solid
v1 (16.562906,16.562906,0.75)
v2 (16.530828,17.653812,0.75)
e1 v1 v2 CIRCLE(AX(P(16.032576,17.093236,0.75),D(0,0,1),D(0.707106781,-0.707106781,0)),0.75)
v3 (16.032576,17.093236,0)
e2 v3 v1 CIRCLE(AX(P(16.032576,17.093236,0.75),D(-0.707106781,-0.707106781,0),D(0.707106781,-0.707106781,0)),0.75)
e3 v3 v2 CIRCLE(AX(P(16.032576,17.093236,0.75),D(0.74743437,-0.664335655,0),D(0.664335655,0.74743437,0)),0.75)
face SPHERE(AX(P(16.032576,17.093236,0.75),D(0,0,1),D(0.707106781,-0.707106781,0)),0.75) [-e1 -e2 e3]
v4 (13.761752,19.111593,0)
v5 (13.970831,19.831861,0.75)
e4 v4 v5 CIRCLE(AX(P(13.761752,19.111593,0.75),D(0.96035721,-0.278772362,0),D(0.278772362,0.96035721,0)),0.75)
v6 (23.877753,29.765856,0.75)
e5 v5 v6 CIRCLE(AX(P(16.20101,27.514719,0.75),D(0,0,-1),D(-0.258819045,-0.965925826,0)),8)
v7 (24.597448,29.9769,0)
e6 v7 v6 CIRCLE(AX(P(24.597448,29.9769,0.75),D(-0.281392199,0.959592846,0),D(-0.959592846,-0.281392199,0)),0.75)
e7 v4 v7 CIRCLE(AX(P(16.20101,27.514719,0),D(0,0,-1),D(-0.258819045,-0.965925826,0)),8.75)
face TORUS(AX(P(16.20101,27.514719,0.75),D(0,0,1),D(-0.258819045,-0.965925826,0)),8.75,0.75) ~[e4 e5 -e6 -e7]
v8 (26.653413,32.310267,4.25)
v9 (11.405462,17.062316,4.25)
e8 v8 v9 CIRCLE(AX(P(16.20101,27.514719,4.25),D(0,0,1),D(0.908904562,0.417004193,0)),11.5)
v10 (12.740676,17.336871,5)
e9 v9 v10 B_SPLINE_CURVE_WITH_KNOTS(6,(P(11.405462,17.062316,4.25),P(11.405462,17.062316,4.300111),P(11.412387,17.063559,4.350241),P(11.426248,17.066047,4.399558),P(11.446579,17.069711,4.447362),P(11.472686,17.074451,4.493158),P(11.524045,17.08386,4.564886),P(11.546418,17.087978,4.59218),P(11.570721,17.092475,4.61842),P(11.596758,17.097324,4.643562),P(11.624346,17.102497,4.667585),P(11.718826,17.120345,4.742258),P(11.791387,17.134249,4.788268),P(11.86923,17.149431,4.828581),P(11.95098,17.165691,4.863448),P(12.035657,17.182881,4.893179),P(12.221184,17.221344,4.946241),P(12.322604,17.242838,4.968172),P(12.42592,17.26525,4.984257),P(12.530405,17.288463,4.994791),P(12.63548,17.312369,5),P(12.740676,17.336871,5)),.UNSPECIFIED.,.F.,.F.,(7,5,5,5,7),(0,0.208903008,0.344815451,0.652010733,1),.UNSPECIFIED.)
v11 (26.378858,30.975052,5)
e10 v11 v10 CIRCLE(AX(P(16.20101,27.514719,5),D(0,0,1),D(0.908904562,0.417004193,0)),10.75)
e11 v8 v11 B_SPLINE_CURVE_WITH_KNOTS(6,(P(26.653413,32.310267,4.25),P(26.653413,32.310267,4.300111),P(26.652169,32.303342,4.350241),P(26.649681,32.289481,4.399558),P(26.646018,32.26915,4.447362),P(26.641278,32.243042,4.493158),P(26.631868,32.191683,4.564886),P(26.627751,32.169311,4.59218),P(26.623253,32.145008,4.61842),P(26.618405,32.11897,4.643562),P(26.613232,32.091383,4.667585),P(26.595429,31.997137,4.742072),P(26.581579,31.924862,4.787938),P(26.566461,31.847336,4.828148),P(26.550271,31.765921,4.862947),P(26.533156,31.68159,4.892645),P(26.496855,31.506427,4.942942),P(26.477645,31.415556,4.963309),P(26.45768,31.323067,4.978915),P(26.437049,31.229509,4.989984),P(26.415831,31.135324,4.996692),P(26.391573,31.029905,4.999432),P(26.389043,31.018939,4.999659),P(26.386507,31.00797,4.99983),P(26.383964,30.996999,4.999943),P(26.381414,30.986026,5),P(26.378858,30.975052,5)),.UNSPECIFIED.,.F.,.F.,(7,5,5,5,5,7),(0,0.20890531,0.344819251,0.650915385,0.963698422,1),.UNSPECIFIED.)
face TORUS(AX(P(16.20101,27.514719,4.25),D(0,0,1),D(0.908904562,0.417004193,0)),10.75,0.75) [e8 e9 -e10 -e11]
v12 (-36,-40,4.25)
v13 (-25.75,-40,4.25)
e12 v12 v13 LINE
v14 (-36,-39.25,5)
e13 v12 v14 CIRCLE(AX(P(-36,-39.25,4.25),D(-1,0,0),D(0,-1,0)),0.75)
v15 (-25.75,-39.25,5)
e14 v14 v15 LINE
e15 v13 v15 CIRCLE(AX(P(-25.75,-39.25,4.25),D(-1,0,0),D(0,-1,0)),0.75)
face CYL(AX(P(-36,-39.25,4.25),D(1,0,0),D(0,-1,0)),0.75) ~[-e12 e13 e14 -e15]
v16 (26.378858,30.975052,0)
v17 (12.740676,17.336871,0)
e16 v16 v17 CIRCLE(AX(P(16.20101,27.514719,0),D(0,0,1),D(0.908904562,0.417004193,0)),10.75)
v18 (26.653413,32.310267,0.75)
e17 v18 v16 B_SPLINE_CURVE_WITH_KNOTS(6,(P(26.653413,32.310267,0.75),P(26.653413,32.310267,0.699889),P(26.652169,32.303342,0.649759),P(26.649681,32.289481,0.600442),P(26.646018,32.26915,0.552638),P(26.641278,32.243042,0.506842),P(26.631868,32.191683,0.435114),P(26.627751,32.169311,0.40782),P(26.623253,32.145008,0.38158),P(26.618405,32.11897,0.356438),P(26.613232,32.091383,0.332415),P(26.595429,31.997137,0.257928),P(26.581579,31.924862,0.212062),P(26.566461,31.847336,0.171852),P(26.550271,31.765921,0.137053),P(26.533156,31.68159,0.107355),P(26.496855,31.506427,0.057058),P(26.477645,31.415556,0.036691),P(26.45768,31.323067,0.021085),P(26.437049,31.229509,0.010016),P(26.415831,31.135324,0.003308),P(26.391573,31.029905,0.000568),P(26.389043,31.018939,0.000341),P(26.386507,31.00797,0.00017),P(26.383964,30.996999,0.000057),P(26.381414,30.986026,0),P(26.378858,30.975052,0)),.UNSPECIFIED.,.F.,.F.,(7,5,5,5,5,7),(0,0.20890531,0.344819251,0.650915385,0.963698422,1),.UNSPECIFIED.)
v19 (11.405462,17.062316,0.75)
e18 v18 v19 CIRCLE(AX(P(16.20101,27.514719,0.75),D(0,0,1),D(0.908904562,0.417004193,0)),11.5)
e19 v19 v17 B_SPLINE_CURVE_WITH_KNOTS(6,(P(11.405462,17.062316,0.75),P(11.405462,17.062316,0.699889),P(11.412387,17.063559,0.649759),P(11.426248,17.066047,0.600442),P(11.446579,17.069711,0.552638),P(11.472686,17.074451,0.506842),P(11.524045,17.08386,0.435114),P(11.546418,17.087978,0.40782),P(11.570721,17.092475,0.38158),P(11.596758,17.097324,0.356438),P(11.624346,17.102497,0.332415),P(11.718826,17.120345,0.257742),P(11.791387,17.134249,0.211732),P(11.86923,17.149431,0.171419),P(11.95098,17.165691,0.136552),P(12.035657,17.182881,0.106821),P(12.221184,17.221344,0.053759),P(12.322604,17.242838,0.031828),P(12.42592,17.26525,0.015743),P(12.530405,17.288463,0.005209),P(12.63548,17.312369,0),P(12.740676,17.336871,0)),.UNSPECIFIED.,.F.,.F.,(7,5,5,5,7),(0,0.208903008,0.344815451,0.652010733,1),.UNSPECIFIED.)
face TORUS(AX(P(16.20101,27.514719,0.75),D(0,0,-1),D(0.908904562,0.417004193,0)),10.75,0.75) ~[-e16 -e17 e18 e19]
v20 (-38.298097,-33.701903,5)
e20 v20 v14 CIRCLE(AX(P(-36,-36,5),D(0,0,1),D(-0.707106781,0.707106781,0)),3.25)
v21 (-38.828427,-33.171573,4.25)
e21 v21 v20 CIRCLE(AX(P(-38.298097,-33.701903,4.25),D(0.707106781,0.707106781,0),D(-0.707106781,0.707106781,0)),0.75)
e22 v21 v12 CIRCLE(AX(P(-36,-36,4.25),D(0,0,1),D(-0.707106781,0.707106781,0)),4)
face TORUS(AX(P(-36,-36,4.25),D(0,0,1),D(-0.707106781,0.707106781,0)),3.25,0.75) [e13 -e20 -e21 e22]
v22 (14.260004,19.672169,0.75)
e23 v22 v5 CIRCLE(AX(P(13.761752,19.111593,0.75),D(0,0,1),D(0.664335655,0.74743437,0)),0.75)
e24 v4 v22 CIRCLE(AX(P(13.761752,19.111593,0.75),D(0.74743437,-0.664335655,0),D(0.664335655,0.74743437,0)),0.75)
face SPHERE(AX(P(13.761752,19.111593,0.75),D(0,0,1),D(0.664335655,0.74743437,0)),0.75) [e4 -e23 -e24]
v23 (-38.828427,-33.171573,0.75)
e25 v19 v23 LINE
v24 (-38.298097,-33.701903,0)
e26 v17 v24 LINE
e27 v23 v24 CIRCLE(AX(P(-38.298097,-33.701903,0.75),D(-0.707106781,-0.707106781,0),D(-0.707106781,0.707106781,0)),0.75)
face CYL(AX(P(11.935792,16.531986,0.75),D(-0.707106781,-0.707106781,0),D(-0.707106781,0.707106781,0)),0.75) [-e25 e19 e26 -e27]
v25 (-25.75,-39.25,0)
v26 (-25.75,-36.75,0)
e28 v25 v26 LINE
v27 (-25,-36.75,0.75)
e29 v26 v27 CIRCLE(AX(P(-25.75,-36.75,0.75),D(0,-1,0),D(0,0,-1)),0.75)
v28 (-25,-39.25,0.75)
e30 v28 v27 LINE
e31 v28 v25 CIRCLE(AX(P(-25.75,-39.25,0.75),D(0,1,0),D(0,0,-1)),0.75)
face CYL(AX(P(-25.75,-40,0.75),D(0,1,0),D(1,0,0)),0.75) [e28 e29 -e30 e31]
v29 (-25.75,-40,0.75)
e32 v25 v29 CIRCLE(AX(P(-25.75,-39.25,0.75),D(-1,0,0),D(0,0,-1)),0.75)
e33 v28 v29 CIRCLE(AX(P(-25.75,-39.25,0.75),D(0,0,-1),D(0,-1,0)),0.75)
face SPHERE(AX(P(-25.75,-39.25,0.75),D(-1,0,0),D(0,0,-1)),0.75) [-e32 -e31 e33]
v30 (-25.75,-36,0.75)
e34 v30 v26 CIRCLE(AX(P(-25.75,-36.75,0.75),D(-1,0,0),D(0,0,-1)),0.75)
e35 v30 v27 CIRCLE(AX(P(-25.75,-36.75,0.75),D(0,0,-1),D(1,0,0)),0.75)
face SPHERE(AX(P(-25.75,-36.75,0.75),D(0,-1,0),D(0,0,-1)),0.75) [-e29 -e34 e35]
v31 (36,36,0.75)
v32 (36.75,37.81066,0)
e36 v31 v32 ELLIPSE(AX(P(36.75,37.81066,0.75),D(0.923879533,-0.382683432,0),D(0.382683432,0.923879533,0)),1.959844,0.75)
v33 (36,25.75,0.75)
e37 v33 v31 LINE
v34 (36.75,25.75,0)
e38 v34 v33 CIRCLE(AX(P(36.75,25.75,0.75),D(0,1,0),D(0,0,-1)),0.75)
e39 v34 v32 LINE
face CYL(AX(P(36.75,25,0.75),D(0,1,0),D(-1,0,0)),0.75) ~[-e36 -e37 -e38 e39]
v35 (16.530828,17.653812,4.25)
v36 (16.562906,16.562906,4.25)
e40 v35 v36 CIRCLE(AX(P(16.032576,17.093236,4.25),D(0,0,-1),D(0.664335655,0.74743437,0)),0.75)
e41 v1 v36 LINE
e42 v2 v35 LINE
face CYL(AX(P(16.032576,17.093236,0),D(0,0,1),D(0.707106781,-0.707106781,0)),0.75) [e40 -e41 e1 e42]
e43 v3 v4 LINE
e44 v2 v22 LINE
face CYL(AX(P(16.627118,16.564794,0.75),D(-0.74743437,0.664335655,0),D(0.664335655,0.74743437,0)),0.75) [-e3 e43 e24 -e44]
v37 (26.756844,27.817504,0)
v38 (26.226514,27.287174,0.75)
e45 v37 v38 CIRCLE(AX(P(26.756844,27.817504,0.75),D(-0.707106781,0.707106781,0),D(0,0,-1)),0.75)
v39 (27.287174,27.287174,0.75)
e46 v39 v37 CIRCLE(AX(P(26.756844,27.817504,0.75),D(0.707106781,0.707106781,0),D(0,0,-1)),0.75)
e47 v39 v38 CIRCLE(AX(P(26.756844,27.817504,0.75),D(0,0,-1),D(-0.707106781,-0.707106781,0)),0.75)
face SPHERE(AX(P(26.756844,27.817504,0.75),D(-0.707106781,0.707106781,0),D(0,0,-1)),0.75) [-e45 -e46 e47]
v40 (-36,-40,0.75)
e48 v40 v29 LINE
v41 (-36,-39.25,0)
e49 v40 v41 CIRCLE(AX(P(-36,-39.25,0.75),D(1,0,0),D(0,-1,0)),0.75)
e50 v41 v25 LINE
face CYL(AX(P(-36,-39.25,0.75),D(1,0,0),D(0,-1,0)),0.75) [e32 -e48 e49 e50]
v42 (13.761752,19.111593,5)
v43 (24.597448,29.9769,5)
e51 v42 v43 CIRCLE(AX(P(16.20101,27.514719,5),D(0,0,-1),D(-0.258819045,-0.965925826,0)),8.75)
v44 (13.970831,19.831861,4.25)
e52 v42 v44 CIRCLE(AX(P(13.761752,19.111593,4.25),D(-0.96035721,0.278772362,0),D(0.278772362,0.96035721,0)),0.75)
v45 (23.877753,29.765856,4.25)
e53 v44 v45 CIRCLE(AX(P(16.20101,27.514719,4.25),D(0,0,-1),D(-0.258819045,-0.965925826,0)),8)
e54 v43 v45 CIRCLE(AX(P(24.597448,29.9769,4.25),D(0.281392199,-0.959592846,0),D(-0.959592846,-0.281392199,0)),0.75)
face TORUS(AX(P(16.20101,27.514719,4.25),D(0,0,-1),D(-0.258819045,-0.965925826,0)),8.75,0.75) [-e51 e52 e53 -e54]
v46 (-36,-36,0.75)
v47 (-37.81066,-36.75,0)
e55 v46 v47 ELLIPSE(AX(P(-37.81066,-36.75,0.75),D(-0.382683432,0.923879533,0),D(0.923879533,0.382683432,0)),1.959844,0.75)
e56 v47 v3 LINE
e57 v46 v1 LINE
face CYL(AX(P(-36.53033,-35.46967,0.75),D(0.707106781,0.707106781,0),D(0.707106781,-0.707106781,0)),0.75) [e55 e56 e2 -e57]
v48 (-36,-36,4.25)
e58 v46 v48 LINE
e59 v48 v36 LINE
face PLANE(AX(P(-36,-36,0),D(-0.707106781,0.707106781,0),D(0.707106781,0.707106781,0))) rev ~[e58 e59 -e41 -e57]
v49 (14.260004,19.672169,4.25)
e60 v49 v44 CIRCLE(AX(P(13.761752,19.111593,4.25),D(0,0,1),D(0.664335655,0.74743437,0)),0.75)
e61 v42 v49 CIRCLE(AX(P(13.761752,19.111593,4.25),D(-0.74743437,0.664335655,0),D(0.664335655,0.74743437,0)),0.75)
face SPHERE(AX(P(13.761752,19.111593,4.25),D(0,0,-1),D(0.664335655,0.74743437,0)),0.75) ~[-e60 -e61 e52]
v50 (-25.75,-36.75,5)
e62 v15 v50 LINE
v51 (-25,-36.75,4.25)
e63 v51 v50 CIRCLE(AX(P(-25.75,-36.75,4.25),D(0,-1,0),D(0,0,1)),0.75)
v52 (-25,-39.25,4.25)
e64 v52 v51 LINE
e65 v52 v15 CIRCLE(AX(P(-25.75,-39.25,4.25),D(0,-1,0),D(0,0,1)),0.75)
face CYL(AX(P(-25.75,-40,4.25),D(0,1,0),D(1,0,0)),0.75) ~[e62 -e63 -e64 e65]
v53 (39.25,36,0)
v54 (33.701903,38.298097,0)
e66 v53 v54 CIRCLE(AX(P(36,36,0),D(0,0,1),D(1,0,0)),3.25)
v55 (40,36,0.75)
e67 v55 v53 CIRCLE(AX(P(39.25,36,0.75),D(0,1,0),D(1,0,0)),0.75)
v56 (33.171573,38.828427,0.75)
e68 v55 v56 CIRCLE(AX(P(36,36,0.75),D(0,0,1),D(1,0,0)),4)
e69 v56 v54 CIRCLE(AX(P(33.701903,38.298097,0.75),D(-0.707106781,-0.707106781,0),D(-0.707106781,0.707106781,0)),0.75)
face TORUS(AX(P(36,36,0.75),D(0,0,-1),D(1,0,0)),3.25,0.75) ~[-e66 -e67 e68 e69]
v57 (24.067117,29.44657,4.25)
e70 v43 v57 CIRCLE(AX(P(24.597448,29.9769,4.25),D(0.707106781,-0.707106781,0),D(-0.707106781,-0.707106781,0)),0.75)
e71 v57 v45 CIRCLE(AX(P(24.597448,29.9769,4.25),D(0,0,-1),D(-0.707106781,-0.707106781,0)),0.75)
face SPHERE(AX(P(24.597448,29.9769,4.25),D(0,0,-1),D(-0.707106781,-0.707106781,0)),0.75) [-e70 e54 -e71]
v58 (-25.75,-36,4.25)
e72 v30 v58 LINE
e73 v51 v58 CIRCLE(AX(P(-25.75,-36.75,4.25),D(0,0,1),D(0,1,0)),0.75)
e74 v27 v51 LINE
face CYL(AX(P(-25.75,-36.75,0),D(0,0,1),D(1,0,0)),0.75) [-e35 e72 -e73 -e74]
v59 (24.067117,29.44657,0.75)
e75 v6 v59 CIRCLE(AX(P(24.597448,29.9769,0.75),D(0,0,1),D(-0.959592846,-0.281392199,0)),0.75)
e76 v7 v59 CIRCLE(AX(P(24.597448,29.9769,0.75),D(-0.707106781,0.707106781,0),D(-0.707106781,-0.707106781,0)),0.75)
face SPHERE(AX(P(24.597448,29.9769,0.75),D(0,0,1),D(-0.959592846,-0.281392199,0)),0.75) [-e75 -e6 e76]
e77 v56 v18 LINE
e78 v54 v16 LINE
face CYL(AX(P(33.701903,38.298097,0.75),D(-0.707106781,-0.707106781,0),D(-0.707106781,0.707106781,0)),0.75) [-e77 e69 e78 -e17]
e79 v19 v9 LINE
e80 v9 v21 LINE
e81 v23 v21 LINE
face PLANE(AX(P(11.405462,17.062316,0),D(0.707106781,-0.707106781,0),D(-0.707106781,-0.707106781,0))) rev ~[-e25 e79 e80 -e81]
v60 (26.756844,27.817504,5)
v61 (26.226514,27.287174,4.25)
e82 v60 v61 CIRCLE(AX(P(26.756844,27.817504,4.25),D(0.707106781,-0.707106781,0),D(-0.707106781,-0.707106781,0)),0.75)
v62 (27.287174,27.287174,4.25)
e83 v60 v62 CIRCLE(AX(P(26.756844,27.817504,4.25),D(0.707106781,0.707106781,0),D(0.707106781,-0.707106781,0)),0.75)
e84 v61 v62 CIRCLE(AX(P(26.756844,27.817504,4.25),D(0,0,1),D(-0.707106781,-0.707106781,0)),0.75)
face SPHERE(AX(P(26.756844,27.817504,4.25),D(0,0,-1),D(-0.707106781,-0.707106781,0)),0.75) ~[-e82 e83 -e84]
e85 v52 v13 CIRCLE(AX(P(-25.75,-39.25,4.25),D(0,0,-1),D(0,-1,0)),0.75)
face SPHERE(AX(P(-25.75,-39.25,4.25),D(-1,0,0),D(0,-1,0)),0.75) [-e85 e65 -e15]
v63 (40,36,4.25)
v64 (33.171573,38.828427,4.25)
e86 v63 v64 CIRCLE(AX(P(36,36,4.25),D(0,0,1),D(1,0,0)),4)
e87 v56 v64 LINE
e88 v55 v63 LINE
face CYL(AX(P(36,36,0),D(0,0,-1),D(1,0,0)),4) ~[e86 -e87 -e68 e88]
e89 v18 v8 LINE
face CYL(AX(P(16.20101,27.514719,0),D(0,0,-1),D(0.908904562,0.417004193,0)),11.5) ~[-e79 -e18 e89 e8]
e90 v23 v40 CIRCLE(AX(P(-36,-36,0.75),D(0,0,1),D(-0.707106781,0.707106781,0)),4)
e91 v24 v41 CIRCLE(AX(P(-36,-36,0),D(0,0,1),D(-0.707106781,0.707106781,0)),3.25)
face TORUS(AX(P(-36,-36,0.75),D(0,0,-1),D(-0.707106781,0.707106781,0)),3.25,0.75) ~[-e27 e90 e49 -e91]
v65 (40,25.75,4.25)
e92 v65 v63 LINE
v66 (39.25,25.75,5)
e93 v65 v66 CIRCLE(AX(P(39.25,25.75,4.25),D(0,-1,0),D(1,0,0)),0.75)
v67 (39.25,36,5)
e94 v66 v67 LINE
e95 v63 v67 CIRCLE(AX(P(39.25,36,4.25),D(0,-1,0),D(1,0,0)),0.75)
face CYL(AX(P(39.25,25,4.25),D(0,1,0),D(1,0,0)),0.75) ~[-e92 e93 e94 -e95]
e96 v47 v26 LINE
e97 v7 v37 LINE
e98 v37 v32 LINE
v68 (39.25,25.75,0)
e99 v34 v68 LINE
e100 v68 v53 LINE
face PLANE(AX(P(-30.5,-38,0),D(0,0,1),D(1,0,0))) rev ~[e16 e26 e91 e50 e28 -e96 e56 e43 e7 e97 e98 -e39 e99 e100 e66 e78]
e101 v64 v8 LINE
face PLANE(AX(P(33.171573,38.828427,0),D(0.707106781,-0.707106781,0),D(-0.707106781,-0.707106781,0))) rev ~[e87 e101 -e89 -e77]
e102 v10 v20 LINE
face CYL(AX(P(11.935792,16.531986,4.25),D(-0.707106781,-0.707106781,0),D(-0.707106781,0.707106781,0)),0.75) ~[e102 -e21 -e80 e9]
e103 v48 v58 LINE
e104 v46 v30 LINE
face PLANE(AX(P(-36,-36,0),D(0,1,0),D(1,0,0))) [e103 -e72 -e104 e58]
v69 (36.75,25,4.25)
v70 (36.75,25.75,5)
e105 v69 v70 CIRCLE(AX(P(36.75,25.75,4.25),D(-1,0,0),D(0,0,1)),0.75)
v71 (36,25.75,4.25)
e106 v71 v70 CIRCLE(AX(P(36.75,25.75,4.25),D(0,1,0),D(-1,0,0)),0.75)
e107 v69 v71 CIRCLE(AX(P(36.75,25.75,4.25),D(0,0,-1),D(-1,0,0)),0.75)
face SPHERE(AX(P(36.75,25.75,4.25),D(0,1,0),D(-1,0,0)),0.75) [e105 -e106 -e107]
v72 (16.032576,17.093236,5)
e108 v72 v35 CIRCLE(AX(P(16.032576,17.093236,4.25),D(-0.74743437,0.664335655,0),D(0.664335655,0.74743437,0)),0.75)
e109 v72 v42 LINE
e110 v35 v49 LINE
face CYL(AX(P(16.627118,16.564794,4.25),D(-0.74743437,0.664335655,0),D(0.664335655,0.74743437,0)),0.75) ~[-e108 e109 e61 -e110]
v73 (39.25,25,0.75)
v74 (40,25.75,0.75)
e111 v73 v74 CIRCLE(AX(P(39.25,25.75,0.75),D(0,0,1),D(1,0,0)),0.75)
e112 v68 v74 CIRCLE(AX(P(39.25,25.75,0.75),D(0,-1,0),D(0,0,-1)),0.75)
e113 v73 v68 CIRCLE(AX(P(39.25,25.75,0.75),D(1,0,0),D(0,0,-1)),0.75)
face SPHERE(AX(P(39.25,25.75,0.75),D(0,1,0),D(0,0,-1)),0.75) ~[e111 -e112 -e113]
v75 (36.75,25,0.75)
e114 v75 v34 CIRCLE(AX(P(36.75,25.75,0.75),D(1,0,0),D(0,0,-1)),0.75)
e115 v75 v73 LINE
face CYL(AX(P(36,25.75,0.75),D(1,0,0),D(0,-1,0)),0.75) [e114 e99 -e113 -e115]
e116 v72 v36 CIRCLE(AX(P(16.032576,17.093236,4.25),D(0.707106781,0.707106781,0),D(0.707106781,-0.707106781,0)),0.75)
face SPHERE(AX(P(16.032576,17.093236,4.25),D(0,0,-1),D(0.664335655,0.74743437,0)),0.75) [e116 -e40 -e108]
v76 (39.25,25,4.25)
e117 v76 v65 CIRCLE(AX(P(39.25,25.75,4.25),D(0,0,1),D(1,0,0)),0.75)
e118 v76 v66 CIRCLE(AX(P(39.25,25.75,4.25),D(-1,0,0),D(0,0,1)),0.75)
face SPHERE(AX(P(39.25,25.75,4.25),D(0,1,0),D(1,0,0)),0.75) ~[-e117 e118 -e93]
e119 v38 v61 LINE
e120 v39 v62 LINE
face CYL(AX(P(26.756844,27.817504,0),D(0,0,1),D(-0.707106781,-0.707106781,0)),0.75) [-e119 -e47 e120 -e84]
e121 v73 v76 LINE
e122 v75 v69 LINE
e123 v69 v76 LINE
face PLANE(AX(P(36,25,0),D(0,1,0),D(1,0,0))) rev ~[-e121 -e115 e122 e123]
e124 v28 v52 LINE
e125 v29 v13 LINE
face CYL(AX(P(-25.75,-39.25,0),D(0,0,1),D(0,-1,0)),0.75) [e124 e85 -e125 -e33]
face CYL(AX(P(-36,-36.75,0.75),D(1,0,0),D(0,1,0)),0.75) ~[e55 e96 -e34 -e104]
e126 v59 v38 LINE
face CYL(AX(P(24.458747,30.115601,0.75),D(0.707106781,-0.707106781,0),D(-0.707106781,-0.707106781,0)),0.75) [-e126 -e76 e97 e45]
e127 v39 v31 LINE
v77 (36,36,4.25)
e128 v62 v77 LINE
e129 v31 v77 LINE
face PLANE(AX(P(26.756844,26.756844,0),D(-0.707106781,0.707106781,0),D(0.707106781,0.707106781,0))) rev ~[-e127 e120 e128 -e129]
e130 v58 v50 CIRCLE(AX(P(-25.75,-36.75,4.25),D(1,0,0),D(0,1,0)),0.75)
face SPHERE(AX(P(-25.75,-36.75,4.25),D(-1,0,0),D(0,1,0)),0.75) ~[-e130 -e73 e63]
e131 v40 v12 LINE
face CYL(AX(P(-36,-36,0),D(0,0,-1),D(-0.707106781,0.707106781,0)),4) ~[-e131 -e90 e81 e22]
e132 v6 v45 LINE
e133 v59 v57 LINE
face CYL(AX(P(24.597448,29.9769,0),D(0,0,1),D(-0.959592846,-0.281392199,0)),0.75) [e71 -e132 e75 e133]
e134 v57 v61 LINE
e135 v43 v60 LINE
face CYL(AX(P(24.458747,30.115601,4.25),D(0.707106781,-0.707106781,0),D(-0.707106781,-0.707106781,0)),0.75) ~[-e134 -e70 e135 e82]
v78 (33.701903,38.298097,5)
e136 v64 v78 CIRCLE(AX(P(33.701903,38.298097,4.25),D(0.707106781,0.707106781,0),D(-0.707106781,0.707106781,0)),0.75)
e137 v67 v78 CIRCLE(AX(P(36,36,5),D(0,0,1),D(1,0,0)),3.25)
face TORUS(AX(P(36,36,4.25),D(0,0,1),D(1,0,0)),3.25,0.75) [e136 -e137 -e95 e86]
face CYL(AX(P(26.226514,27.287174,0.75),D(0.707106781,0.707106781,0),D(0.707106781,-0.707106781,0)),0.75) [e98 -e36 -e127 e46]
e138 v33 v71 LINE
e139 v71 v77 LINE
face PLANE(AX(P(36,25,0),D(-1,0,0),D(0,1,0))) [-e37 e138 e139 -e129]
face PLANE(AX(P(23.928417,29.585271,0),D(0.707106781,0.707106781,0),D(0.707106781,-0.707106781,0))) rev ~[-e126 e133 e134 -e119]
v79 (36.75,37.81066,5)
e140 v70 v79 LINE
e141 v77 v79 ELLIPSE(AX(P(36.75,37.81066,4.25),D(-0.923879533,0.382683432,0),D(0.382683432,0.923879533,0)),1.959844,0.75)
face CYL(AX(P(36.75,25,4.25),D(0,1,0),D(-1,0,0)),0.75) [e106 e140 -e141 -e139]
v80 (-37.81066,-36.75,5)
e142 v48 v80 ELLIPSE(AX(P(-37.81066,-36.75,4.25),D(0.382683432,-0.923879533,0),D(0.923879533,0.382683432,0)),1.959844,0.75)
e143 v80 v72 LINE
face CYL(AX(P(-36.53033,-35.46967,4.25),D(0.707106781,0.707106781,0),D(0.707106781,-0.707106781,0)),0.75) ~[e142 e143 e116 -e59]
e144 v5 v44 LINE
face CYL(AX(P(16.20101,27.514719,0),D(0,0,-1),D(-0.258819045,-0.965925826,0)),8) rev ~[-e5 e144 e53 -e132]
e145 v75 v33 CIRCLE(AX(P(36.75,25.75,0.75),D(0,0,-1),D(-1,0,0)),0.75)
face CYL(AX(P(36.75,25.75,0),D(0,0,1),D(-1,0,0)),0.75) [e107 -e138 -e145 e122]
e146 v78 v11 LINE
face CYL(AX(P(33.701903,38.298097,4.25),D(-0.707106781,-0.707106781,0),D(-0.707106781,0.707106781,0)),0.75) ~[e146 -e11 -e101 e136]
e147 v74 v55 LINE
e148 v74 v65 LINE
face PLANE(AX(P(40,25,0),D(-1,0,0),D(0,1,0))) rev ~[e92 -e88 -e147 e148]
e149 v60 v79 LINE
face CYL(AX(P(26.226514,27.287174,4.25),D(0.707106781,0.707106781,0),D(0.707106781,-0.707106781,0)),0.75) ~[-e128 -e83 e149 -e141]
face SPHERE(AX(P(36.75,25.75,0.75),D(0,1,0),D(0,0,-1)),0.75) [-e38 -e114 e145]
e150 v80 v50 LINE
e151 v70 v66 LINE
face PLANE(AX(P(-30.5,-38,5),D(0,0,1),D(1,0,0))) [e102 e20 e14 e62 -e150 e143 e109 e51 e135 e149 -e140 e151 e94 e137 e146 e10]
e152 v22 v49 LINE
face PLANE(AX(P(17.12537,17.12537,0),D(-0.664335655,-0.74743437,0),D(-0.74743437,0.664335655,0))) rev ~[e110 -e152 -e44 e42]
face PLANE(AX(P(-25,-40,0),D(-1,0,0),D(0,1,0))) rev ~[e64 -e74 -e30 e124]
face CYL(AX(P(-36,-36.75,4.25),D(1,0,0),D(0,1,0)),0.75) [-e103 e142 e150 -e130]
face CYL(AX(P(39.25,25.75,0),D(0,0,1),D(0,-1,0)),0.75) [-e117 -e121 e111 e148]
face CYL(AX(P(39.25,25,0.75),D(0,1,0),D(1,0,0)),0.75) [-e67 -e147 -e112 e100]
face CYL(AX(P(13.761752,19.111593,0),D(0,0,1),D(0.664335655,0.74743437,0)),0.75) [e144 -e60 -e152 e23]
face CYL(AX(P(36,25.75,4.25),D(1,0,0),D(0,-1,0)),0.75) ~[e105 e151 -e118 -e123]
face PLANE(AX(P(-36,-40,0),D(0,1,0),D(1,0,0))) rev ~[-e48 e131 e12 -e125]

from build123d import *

# Parameters (mm, degrees)
F0_W     = 11
F0_H     = 4
F0_W_2   = 4
F0_H_2   = 11
F1_DEPTH = 5
F2_R     = 0.75


# Not quite as in the source:
# - a feature names something its author has since deleted; it is built from what else it names


with BuildPart() as f1:
    # F0 (on Top) → F1 (new body)
    with BuildSketch(Plane.XY):
        with Locations((-30.5, -38)):
            Rectangle(F0_W, F0_H)
        with Locations((38, 30.5)):
            Rectangle(F0_W_2, F0_H_2)
        with BuildLine():
            Line((-38.8284271247, -33.1715728753), (-36, -36))
            Line((-36, -36), (16.0162036535, 16.0162036535))
            ThreePointArc((16.0162036535, 16.0162036535), (13.656492284, 16.2997541163), (11.4054619105, 17.06231616))
            Line((11.4054619105, 17.06231616), (-38.8284271247, -33.1715728753))
        make_face()
        with BuildLine():
            Line((-36, -40), (-36, -36))
            Line((-36, -36), (-38.8284271247, -33.1715728753))
            ThreePointArc((-38.8284271247, -33.1715728753), (-39.69551813, -37.5307337295), (-36, -40))
        make_face()
        with BuildLine():
            Line((33.1715728753, 38.8284271247), (36, 36))
            Line((36, 36), (40, 36))
            ThreePointArc((40, 36), (37.5307337295, 39.69551813), (33.1715728753, 38.8284271247))
        make_face()
        with BuildLine():
            Line((27.699525099, 27.699525099), (36, 36))
            Line((36, 36), (33.1715728753, 38.8284271247))
            Line((33.1715728753, 38.8284271247), (26.6534125925, 32.310266842))
            ThreePointArc((26.6534125925, 32.310266842), (27.4159746362, 30.0592364686), (27.699525099, 27.699525099))
        make_face()
        with BuildLine():
            ThreePointArc((11.4054619105, 17.06231616), (13.656492284, 16.2997541163), (16.0162036535, 16.0162036535))
            Line((16.0162036535, 16.0162036535), (17.1253699809, 17.1253699809))
            Line((17.1253699809, 17.1253699809), (14.130457766, 19.7873120154))
            Line((14.130457766, 19.7873120154), (11.4054619105, 17.06231616))
        make_face()
        with BuildLine():
            Line((26.7568438618, 26.7568438618), (27.699525099, 27.699525099))
            ThreePointArc((27.699525099, 27.699525099), (27.4159746362, 30.0592364686), (26.6534125925, 32.310266842))
            Line((26.6534125925, 32.310266842), (23.9284167371, 29.5852709866))
            Line((23.9284167371, 29.5852709866), (26.7568438618, 26.7568438618))
        make_face()
        with BuildLine():
            ThreePointArc((26.6534125925, 32.310266842), (8.0692821431, 35.6464466094), (11.4054619105, 17.06231616))
            Line((11.4054619105, 17.06231616), (14.130457766, 19.7873120154))
            ThreePointArc((14.130457766, 19.7873120154), (10.5441558773, 33.1715728753), (23.9284167371, 29.5852709866))
            Line((23.9284167371, 29.5852709866), (26.6534125925, 32.310266842))
        make_face()
    extrude(amount=F1_DEPTH)

    # F2
    f2_edges = [f1.edges().sort_by_distance(p)[0] for p in [
        (-13.711483, -8.054628, 0),
        (29.912493, 35.569347, 0),
        (-13.711483, -8.054628, 5),
        (29.912493, 35.569347, 5),
        (-25, -38, 0),
        (-30.5, -36, 0),
        (-9.437315, -9.437315, 0),
        (15.627914, 18.456341, 0),
        (10.544156, 33.171573, 0),
        (25.34263, 28.171057, 0),
        (31.378422, 31.378422, 0),
        (36, 30.5, 0),
        (38, 25, 0),
        (40, 30.5, 0),
        (37.530734, 39.695518, 0),
        (8.069282, 35.646447, 0),
        (-39.695518, -37.530734, 0),
        (-30.5, -40, 0),
        (36, 30.5, 5),
        (36, 25, 2.5),
        (40, 25, 2.5),
        (38, 25, 5),
        (-9.437315, -9.437315, 5),
        (-30.5, -36, 5),
        (-25, -40, 2.5),
        (-25, -36, 2.5),
        (-25, -38, 5),
        (23.928417, 29.585271, 2.5),
        (26.756844, 26.756844, 2.5),
        (17.12537, 17.12537, 2.5),
        (14.130458, 19.787312, 2.5),
        (8.069282, 35.646447, 5),
        (15.627914, 18.456341, 5),
        (25.34263, 28.171057, 5),
        (10.544156, 33.171573, 5),
        (31.378422, 31.378422, 5),
        (40, 30.5, 5),
        (37.530734, 39.695518, 5),
        (-39.695518, -37.530734, 5),
        (-30.5, -40, 5),
    ]]
    fillet(f2_edges, radius=F2_R)


solid = f1.part
